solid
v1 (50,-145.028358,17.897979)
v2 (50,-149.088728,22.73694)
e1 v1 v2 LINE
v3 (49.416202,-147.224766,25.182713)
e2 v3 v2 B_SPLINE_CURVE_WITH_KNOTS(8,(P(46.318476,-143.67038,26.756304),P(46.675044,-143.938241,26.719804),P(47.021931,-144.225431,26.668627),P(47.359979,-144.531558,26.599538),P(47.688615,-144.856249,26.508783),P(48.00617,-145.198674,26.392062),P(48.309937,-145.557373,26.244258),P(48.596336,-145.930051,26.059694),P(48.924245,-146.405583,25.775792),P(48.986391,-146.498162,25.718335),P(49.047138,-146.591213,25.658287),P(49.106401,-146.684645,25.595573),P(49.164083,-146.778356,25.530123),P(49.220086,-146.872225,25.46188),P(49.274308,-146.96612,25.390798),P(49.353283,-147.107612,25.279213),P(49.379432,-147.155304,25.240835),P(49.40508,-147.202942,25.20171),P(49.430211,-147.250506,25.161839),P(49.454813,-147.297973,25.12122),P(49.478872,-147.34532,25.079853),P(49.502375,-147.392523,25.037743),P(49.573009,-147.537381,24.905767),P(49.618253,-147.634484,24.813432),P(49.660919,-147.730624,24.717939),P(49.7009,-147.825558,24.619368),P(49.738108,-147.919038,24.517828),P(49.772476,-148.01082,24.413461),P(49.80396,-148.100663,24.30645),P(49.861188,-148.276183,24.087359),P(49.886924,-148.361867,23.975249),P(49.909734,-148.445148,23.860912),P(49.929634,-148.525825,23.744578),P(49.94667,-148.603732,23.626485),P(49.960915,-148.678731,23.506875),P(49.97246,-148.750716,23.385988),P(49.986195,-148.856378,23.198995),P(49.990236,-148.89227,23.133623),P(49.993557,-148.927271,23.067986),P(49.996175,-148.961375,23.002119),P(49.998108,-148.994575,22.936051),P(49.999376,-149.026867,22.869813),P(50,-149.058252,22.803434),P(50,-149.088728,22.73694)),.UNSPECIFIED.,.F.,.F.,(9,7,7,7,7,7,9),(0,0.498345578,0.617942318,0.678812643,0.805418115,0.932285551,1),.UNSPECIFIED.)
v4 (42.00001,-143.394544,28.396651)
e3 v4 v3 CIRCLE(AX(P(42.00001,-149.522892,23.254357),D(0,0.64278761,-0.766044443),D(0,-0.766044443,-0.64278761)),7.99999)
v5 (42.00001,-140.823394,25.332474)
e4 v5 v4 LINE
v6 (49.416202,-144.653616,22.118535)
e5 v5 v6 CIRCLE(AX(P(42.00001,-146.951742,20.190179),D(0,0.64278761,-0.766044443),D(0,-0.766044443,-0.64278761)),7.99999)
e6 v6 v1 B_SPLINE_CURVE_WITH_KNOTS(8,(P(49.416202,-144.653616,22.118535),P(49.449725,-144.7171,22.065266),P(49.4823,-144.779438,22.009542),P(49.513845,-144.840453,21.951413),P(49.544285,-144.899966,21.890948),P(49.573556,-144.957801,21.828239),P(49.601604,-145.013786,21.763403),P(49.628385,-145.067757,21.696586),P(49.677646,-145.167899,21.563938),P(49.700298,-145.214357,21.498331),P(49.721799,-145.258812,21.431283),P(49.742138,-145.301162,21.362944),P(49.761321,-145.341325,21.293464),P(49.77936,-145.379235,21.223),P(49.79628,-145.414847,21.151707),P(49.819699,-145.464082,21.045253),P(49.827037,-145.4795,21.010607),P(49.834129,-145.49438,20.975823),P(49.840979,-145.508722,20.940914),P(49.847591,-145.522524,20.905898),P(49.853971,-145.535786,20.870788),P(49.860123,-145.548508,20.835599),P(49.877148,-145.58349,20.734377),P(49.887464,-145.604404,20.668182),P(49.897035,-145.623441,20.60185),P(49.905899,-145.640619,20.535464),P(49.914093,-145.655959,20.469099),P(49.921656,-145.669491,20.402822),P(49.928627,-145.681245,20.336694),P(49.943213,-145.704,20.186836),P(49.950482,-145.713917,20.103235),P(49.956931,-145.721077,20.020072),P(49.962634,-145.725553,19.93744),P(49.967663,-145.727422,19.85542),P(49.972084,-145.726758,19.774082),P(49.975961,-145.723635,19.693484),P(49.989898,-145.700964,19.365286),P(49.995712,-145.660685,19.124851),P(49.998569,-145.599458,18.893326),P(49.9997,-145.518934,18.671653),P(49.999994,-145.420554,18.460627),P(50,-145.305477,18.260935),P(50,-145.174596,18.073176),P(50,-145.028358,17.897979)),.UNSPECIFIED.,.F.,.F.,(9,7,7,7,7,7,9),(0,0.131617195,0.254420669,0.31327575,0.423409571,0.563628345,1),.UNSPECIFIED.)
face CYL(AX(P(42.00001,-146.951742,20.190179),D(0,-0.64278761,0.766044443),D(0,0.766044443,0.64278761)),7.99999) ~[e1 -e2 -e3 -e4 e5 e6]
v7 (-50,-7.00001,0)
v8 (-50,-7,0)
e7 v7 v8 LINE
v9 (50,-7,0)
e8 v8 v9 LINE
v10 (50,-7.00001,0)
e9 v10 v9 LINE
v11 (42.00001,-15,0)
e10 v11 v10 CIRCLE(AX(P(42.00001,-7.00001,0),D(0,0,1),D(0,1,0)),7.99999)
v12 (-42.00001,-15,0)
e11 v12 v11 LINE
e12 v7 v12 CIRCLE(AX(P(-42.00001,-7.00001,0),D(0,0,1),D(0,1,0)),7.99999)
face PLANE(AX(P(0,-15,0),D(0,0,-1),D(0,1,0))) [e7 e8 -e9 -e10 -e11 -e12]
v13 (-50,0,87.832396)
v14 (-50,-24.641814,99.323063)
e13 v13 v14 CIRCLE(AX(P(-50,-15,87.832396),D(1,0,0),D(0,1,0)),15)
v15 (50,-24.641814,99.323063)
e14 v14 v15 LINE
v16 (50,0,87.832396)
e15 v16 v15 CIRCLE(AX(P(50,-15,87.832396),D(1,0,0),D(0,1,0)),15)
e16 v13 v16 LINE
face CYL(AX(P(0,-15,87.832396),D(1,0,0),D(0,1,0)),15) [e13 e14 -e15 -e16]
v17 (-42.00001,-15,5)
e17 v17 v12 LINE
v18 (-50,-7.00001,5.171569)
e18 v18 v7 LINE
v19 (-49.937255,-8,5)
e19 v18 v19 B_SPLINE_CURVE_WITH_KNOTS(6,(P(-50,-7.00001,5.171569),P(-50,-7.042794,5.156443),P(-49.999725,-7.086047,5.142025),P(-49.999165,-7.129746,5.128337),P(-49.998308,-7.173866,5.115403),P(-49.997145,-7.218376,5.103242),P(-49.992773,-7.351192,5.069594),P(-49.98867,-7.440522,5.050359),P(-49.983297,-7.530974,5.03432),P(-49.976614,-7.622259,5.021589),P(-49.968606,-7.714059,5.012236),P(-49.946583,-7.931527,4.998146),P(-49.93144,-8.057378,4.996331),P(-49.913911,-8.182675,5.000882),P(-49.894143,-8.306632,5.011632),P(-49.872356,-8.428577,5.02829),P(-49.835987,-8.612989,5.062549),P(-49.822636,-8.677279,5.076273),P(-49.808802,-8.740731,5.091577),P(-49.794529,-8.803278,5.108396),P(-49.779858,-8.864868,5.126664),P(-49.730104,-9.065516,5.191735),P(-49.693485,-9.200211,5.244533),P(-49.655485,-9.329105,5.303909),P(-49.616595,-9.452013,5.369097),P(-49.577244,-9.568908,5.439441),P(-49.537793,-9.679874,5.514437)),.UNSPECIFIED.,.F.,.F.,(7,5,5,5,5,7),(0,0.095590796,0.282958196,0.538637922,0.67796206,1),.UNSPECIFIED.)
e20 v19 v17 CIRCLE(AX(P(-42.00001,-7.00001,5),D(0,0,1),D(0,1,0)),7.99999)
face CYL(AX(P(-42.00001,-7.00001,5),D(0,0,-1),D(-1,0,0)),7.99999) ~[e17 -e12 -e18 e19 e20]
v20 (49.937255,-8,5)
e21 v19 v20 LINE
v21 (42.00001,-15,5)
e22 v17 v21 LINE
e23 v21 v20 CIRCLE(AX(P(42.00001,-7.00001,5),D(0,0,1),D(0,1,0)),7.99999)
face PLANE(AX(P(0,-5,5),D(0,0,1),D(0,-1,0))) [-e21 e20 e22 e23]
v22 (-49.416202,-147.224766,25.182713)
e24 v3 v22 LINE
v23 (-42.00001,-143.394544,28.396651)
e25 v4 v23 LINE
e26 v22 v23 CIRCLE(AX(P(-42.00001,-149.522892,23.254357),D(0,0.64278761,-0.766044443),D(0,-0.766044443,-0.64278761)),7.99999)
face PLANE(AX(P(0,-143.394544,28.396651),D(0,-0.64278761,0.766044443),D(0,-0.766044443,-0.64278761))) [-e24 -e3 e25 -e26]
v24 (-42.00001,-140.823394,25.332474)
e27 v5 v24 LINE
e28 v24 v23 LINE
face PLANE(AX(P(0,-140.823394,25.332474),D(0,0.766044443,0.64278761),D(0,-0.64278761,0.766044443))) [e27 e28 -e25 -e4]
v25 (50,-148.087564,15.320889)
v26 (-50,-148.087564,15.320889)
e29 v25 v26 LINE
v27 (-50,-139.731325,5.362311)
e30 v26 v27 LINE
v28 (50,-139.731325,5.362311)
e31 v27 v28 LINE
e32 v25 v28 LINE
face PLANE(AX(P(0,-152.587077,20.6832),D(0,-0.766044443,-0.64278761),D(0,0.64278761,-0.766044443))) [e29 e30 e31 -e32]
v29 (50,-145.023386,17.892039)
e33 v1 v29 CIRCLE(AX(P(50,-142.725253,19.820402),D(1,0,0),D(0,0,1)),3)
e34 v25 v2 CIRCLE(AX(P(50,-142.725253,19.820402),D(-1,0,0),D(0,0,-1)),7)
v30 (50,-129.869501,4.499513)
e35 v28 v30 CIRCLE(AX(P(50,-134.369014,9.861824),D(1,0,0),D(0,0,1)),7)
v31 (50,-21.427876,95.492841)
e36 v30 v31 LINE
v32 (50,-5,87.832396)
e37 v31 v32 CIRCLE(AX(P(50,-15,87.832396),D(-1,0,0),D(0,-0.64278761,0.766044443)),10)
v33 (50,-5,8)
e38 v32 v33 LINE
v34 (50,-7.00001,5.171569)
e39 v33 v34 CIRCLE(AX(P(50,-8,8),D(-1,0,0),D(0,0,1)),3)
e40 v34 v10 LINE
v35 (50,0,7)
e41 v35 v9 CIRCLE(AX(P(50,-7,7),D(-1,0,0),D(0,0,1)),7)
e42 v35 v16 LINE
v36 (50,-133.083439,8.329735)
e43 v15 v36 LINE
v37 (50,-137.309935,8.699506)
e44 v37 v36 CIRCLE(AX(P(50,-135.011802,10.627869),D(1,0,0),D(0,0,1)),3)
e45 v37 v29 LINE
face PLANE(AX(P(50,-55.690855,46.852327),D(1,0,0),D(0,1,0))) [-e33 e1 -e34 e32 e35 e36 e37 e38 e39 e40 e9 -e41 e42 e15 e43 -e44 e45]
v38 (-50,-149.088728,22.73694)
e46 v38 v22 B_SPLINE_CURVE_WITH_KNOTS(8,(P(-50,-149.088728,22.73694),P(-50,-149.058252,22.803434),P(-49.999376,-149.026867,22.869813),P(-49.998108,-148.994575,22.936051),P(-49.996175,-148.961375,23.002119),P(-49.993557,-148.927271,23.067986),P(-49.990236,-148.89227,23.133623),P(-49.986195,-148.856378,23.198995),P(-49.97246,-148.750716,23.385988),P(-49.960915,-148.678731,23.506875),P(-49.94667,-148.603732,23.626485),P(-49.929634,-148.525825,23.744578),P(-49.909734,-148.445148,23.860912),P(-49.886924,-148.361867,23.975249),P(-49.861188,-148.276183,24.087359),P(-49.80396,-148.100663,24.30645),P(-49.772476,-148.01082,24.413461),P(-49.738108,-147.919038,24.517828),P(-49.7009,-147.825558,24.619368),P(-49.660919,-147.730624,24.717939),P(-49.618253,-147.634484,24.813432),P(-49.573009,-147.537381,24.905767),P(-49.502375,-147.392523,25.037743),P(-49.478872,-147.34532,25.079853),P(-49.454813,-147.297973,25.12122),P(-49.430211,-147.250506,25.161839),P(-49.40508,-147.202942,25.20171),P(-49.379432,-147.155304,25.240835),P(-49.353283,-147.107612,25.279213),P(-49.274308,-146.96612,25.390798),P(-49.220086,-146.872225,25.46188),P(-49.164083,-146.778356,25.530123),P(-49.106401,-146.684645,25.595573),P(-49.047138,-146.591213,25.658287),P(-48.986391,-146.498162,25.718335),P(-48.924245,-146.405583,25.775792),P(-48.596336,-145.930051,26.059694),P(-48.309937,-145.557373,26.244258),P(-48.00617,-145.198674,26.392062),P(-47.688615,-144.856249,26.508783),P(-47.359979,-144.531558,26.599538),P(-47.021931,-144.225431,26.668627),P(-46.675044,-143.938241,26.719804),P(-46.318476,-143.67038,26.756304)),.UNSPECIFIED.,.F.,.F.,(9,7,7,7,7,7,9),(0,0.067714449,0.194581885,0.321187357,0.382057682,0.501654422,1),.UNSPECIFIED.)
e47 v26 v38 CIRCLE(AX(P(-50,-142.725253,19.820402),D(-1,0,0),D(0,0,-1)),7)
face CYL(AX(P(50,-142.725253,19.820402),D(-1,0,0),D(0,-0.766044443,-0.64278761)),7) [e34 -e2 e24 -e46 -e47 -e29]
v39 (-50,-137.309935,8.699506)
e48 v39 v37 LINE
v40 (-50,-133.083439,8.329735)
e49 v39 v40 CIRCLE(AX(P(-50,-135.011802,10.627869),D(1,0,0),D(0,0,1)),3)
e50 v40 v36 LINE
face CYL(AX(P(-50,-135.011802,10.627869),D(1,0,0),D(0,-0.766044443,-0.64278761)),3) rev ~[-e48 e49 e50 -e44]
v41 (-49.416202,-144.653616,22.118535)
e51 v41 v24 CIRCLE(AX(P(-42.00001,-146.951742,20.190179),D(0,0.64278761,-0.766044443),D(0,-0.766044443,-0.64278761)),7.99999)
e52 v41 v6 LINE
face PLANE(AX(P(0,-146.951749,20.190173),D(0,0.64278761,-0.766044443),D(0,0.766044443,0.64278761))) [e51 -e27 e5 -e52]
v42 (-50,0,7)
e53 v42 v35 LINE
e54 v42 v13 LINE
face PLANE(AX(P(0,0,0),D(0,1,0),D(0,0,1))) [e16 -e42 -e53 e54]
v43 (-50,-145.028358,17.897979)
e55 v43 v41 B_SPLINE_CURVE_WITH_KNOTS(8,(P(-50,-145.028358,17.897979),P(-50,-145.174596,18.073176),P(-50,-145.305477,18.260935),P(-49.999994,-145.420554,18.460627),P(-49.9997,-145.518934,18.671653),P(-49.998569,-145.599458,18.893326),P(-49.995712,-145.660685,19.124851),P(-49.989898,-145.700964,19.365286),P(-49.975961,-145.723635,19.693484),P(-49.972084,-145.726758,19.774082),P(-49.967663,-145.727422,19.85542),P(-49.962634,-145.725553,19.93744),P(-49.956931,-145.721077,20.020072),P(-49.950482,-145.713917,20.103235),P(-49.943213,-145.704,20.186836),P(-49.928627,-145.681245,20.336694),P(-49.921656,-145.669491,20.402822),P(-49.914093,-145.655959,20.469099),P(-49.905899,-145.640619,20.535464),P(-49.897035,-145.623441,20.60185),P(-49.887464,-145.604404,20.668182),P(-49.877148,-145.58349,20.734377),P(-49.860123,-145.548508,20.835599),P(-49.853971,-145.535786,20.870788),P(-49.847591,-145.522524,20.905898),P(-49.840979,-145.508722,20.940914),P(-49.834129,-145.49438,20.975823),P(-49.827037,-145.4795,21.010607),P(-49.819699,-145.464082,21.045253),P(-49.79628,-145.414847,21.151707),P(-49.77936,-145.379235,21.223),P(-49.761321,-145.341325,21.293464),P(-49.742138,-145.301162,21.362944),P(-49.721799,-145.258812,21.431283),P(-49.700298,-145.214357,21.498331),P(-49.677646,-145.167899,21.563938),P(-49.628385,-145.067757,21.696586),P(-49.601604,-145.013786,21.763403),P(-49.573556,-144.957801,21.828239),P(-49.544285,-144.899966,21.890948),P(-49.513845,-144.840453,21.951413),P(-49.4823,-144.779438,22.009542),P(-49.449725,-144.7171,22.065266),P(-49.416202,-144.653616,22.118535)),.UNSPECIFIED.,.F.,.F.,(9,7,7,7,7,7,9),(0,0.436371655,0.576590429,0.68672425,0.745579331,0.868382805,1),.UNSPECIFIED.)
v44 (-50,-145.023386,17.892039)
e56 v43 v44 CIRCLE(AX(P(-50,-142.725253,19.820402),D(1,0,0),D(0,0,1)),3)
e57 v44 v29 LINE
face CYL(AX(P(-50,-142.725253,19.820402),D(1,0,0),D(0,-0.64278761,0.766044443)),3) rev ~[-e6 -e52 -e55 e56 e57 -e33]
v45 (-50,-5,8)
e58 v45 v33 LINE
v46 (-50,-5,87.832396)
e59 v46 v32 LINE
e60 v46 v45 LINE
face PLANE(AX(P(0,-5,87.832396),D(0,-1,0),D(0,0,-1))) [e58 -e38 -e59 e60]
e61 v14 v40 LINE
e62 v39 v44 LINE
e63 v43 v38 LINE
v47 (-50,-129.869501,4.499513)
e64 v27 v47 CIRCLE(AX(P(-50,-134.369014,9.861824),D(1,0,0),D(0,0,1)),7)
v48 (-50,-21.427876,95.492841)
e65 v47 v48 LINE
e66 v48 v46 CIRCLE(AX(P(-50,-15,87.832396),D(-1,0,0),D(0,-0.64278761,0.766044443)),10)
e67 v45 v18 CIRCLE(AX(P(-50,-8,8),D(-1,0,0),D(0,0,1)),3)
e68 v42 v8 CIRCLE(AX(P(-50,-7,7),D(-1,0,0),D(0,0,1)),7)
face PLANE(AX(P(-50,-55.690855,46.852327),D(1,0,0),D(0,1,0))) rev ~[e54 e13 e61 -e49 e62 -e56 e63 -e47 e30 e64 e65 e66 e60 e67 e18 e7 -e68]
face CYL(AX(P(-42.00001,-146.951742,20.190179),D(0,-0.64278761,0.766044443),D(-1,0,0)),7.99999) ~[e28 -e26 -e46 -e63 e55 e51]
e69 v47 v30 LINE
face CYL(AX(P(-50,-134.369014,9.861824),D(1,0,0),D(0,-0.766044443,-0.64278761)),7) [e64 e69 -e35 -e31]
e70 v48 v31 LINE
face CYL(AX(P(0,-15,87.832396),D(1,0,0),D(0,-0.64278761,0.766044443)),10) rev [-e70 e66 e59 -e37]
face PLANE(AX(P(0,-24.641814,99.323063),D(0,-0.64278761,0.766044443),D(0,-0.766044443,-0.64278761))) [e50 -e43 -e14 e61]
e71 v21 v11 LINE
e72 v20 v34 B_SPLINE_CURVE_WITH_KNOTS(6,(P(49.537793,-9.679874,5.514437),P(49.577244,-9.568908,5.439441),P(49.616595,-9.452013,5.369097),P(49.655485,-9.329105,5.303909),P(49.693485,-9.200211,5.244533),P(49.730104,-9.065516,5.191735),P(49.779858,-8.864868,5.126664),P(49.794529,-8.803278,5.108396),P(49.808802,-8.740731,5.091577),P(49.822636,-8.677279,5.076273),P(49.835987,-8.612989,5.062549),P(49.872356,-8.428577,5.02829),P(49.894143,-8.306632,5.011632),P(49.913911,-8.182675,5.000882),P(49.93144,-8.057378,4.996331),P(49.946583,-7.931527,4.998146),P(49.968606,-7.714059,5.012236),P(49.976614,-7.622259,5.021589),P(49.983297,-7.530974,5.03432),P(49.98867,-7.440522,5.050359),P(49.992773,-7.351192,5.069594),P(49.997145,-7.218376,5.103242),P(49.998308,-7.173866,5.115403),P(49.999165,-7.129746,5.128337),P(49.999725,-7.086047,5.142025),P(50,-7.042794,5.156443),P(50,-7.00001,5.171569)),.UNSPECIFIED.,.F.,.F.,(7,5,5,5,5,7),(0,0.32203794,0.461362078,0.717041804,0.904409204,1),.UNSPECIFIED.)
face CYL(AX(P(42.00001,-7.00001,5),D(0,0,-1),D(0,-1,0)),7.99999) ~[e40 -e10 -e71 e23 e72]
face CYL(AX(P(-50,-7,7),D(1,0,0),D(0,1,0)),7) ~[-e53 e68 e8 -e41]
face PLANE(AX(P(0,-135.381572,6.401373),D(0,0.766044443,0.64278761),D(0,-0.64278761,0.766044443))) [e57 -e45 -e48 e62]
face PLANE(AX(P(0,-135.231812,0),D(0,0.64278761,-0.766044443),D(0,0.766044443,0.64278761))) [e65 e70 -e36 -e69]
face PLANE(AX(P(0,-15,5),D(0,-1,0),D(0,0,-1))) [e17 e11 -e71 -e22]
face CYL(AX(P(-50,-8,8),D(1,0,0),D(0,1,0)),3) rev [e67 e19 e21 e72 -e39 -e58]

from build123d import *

# Parameters (mm, degrees)
F1_DEPTH = 50
F2_R     = 7
F3_R     = 3
F4_R     = 7.99999


# Not quite as in the source:
# - a fillet or chamfer is up to 0.001 mm smaller than in the source, because OpenCascade refuses the exact size


with BuildPart() as f1:
    # F0 (on Right) → F1 (new body, symmetric)
    with BuildSketch(Plane.YZ):
        with BuildLine():
            Line((-152.5870774385, 20.6831999642), (-135.231811977, 0))
            Line((-135.231811977, 0), (-21.4278760969, 95.4928406235))
            ThreePointArc((-21.4278760969, 95.4928406235), (-10.7738173826, 96.8954740627), (-5, 87.8323961924))
            Line((-5, 87.8323961924), (-5, 5))
            Line((-5, 5), (-15, 5))
            Line((-15, 5), (-15, 0))
            Line((-15, 0), (0, 0))
            Line((0, 0), (0, 87.8323961924))
            ThreePointArc((0, 87.8323961924), (-8.6607260739, 101.4270129979), (-24.6418141453, 99.3230628391))
            Line((-24.6418141453, 99.3230628391), (-135.381572253, 6.4013726543))
            Line((-135.381572253, 6.4013726543), (-146.9517492273, 20.1901726305))
            Line((-146.9517492273, 20.1901726305), (-140.8233936824, 25.332473508))
            Line((-140.8233936824, 25.332473508), (-143.3945441211, 28.3966512805))
            Line((-143.3945441211, 28.3966512805), (-152.5870774385, 20.6831999642))
        make_face()
    extrude(amount=F1_DEPTH, both=True)

    # F2
    f2_edges = [f1.edges().sort_by_distance(p)[0] for p in [
        (0, -135.231812, 0),
        (0, -152.587077, 20.6832),
        (0, 0, 0),
    ]]
    fillet(f2_edges, radius=F2_R)

    # F3
    f3_edges = [f1.edges().sort_by_distance(p)[0] for p in [
        (0, -146.951749, 20.190173),
        (0, -135.381572, 6.401373),
        (0, -5, 5),
    ]]
    fillet(f3_edges, radius=F3_R)

    # F4 (radius 8 in the source; OpenCascade refuses exactly that, so slightly less here)
    f4_edges = [f1.edges().sort_by_distance(p)[0] for p in [
        (50, -142.108969, 26.864562),
        (-50, -142.108969, 26.864562),
        (50, -15, 2.5),
        (-50, -15, 2.5),
    ]]
    fillet(f4_edges, radius=F4_R)


solid = f1.part
